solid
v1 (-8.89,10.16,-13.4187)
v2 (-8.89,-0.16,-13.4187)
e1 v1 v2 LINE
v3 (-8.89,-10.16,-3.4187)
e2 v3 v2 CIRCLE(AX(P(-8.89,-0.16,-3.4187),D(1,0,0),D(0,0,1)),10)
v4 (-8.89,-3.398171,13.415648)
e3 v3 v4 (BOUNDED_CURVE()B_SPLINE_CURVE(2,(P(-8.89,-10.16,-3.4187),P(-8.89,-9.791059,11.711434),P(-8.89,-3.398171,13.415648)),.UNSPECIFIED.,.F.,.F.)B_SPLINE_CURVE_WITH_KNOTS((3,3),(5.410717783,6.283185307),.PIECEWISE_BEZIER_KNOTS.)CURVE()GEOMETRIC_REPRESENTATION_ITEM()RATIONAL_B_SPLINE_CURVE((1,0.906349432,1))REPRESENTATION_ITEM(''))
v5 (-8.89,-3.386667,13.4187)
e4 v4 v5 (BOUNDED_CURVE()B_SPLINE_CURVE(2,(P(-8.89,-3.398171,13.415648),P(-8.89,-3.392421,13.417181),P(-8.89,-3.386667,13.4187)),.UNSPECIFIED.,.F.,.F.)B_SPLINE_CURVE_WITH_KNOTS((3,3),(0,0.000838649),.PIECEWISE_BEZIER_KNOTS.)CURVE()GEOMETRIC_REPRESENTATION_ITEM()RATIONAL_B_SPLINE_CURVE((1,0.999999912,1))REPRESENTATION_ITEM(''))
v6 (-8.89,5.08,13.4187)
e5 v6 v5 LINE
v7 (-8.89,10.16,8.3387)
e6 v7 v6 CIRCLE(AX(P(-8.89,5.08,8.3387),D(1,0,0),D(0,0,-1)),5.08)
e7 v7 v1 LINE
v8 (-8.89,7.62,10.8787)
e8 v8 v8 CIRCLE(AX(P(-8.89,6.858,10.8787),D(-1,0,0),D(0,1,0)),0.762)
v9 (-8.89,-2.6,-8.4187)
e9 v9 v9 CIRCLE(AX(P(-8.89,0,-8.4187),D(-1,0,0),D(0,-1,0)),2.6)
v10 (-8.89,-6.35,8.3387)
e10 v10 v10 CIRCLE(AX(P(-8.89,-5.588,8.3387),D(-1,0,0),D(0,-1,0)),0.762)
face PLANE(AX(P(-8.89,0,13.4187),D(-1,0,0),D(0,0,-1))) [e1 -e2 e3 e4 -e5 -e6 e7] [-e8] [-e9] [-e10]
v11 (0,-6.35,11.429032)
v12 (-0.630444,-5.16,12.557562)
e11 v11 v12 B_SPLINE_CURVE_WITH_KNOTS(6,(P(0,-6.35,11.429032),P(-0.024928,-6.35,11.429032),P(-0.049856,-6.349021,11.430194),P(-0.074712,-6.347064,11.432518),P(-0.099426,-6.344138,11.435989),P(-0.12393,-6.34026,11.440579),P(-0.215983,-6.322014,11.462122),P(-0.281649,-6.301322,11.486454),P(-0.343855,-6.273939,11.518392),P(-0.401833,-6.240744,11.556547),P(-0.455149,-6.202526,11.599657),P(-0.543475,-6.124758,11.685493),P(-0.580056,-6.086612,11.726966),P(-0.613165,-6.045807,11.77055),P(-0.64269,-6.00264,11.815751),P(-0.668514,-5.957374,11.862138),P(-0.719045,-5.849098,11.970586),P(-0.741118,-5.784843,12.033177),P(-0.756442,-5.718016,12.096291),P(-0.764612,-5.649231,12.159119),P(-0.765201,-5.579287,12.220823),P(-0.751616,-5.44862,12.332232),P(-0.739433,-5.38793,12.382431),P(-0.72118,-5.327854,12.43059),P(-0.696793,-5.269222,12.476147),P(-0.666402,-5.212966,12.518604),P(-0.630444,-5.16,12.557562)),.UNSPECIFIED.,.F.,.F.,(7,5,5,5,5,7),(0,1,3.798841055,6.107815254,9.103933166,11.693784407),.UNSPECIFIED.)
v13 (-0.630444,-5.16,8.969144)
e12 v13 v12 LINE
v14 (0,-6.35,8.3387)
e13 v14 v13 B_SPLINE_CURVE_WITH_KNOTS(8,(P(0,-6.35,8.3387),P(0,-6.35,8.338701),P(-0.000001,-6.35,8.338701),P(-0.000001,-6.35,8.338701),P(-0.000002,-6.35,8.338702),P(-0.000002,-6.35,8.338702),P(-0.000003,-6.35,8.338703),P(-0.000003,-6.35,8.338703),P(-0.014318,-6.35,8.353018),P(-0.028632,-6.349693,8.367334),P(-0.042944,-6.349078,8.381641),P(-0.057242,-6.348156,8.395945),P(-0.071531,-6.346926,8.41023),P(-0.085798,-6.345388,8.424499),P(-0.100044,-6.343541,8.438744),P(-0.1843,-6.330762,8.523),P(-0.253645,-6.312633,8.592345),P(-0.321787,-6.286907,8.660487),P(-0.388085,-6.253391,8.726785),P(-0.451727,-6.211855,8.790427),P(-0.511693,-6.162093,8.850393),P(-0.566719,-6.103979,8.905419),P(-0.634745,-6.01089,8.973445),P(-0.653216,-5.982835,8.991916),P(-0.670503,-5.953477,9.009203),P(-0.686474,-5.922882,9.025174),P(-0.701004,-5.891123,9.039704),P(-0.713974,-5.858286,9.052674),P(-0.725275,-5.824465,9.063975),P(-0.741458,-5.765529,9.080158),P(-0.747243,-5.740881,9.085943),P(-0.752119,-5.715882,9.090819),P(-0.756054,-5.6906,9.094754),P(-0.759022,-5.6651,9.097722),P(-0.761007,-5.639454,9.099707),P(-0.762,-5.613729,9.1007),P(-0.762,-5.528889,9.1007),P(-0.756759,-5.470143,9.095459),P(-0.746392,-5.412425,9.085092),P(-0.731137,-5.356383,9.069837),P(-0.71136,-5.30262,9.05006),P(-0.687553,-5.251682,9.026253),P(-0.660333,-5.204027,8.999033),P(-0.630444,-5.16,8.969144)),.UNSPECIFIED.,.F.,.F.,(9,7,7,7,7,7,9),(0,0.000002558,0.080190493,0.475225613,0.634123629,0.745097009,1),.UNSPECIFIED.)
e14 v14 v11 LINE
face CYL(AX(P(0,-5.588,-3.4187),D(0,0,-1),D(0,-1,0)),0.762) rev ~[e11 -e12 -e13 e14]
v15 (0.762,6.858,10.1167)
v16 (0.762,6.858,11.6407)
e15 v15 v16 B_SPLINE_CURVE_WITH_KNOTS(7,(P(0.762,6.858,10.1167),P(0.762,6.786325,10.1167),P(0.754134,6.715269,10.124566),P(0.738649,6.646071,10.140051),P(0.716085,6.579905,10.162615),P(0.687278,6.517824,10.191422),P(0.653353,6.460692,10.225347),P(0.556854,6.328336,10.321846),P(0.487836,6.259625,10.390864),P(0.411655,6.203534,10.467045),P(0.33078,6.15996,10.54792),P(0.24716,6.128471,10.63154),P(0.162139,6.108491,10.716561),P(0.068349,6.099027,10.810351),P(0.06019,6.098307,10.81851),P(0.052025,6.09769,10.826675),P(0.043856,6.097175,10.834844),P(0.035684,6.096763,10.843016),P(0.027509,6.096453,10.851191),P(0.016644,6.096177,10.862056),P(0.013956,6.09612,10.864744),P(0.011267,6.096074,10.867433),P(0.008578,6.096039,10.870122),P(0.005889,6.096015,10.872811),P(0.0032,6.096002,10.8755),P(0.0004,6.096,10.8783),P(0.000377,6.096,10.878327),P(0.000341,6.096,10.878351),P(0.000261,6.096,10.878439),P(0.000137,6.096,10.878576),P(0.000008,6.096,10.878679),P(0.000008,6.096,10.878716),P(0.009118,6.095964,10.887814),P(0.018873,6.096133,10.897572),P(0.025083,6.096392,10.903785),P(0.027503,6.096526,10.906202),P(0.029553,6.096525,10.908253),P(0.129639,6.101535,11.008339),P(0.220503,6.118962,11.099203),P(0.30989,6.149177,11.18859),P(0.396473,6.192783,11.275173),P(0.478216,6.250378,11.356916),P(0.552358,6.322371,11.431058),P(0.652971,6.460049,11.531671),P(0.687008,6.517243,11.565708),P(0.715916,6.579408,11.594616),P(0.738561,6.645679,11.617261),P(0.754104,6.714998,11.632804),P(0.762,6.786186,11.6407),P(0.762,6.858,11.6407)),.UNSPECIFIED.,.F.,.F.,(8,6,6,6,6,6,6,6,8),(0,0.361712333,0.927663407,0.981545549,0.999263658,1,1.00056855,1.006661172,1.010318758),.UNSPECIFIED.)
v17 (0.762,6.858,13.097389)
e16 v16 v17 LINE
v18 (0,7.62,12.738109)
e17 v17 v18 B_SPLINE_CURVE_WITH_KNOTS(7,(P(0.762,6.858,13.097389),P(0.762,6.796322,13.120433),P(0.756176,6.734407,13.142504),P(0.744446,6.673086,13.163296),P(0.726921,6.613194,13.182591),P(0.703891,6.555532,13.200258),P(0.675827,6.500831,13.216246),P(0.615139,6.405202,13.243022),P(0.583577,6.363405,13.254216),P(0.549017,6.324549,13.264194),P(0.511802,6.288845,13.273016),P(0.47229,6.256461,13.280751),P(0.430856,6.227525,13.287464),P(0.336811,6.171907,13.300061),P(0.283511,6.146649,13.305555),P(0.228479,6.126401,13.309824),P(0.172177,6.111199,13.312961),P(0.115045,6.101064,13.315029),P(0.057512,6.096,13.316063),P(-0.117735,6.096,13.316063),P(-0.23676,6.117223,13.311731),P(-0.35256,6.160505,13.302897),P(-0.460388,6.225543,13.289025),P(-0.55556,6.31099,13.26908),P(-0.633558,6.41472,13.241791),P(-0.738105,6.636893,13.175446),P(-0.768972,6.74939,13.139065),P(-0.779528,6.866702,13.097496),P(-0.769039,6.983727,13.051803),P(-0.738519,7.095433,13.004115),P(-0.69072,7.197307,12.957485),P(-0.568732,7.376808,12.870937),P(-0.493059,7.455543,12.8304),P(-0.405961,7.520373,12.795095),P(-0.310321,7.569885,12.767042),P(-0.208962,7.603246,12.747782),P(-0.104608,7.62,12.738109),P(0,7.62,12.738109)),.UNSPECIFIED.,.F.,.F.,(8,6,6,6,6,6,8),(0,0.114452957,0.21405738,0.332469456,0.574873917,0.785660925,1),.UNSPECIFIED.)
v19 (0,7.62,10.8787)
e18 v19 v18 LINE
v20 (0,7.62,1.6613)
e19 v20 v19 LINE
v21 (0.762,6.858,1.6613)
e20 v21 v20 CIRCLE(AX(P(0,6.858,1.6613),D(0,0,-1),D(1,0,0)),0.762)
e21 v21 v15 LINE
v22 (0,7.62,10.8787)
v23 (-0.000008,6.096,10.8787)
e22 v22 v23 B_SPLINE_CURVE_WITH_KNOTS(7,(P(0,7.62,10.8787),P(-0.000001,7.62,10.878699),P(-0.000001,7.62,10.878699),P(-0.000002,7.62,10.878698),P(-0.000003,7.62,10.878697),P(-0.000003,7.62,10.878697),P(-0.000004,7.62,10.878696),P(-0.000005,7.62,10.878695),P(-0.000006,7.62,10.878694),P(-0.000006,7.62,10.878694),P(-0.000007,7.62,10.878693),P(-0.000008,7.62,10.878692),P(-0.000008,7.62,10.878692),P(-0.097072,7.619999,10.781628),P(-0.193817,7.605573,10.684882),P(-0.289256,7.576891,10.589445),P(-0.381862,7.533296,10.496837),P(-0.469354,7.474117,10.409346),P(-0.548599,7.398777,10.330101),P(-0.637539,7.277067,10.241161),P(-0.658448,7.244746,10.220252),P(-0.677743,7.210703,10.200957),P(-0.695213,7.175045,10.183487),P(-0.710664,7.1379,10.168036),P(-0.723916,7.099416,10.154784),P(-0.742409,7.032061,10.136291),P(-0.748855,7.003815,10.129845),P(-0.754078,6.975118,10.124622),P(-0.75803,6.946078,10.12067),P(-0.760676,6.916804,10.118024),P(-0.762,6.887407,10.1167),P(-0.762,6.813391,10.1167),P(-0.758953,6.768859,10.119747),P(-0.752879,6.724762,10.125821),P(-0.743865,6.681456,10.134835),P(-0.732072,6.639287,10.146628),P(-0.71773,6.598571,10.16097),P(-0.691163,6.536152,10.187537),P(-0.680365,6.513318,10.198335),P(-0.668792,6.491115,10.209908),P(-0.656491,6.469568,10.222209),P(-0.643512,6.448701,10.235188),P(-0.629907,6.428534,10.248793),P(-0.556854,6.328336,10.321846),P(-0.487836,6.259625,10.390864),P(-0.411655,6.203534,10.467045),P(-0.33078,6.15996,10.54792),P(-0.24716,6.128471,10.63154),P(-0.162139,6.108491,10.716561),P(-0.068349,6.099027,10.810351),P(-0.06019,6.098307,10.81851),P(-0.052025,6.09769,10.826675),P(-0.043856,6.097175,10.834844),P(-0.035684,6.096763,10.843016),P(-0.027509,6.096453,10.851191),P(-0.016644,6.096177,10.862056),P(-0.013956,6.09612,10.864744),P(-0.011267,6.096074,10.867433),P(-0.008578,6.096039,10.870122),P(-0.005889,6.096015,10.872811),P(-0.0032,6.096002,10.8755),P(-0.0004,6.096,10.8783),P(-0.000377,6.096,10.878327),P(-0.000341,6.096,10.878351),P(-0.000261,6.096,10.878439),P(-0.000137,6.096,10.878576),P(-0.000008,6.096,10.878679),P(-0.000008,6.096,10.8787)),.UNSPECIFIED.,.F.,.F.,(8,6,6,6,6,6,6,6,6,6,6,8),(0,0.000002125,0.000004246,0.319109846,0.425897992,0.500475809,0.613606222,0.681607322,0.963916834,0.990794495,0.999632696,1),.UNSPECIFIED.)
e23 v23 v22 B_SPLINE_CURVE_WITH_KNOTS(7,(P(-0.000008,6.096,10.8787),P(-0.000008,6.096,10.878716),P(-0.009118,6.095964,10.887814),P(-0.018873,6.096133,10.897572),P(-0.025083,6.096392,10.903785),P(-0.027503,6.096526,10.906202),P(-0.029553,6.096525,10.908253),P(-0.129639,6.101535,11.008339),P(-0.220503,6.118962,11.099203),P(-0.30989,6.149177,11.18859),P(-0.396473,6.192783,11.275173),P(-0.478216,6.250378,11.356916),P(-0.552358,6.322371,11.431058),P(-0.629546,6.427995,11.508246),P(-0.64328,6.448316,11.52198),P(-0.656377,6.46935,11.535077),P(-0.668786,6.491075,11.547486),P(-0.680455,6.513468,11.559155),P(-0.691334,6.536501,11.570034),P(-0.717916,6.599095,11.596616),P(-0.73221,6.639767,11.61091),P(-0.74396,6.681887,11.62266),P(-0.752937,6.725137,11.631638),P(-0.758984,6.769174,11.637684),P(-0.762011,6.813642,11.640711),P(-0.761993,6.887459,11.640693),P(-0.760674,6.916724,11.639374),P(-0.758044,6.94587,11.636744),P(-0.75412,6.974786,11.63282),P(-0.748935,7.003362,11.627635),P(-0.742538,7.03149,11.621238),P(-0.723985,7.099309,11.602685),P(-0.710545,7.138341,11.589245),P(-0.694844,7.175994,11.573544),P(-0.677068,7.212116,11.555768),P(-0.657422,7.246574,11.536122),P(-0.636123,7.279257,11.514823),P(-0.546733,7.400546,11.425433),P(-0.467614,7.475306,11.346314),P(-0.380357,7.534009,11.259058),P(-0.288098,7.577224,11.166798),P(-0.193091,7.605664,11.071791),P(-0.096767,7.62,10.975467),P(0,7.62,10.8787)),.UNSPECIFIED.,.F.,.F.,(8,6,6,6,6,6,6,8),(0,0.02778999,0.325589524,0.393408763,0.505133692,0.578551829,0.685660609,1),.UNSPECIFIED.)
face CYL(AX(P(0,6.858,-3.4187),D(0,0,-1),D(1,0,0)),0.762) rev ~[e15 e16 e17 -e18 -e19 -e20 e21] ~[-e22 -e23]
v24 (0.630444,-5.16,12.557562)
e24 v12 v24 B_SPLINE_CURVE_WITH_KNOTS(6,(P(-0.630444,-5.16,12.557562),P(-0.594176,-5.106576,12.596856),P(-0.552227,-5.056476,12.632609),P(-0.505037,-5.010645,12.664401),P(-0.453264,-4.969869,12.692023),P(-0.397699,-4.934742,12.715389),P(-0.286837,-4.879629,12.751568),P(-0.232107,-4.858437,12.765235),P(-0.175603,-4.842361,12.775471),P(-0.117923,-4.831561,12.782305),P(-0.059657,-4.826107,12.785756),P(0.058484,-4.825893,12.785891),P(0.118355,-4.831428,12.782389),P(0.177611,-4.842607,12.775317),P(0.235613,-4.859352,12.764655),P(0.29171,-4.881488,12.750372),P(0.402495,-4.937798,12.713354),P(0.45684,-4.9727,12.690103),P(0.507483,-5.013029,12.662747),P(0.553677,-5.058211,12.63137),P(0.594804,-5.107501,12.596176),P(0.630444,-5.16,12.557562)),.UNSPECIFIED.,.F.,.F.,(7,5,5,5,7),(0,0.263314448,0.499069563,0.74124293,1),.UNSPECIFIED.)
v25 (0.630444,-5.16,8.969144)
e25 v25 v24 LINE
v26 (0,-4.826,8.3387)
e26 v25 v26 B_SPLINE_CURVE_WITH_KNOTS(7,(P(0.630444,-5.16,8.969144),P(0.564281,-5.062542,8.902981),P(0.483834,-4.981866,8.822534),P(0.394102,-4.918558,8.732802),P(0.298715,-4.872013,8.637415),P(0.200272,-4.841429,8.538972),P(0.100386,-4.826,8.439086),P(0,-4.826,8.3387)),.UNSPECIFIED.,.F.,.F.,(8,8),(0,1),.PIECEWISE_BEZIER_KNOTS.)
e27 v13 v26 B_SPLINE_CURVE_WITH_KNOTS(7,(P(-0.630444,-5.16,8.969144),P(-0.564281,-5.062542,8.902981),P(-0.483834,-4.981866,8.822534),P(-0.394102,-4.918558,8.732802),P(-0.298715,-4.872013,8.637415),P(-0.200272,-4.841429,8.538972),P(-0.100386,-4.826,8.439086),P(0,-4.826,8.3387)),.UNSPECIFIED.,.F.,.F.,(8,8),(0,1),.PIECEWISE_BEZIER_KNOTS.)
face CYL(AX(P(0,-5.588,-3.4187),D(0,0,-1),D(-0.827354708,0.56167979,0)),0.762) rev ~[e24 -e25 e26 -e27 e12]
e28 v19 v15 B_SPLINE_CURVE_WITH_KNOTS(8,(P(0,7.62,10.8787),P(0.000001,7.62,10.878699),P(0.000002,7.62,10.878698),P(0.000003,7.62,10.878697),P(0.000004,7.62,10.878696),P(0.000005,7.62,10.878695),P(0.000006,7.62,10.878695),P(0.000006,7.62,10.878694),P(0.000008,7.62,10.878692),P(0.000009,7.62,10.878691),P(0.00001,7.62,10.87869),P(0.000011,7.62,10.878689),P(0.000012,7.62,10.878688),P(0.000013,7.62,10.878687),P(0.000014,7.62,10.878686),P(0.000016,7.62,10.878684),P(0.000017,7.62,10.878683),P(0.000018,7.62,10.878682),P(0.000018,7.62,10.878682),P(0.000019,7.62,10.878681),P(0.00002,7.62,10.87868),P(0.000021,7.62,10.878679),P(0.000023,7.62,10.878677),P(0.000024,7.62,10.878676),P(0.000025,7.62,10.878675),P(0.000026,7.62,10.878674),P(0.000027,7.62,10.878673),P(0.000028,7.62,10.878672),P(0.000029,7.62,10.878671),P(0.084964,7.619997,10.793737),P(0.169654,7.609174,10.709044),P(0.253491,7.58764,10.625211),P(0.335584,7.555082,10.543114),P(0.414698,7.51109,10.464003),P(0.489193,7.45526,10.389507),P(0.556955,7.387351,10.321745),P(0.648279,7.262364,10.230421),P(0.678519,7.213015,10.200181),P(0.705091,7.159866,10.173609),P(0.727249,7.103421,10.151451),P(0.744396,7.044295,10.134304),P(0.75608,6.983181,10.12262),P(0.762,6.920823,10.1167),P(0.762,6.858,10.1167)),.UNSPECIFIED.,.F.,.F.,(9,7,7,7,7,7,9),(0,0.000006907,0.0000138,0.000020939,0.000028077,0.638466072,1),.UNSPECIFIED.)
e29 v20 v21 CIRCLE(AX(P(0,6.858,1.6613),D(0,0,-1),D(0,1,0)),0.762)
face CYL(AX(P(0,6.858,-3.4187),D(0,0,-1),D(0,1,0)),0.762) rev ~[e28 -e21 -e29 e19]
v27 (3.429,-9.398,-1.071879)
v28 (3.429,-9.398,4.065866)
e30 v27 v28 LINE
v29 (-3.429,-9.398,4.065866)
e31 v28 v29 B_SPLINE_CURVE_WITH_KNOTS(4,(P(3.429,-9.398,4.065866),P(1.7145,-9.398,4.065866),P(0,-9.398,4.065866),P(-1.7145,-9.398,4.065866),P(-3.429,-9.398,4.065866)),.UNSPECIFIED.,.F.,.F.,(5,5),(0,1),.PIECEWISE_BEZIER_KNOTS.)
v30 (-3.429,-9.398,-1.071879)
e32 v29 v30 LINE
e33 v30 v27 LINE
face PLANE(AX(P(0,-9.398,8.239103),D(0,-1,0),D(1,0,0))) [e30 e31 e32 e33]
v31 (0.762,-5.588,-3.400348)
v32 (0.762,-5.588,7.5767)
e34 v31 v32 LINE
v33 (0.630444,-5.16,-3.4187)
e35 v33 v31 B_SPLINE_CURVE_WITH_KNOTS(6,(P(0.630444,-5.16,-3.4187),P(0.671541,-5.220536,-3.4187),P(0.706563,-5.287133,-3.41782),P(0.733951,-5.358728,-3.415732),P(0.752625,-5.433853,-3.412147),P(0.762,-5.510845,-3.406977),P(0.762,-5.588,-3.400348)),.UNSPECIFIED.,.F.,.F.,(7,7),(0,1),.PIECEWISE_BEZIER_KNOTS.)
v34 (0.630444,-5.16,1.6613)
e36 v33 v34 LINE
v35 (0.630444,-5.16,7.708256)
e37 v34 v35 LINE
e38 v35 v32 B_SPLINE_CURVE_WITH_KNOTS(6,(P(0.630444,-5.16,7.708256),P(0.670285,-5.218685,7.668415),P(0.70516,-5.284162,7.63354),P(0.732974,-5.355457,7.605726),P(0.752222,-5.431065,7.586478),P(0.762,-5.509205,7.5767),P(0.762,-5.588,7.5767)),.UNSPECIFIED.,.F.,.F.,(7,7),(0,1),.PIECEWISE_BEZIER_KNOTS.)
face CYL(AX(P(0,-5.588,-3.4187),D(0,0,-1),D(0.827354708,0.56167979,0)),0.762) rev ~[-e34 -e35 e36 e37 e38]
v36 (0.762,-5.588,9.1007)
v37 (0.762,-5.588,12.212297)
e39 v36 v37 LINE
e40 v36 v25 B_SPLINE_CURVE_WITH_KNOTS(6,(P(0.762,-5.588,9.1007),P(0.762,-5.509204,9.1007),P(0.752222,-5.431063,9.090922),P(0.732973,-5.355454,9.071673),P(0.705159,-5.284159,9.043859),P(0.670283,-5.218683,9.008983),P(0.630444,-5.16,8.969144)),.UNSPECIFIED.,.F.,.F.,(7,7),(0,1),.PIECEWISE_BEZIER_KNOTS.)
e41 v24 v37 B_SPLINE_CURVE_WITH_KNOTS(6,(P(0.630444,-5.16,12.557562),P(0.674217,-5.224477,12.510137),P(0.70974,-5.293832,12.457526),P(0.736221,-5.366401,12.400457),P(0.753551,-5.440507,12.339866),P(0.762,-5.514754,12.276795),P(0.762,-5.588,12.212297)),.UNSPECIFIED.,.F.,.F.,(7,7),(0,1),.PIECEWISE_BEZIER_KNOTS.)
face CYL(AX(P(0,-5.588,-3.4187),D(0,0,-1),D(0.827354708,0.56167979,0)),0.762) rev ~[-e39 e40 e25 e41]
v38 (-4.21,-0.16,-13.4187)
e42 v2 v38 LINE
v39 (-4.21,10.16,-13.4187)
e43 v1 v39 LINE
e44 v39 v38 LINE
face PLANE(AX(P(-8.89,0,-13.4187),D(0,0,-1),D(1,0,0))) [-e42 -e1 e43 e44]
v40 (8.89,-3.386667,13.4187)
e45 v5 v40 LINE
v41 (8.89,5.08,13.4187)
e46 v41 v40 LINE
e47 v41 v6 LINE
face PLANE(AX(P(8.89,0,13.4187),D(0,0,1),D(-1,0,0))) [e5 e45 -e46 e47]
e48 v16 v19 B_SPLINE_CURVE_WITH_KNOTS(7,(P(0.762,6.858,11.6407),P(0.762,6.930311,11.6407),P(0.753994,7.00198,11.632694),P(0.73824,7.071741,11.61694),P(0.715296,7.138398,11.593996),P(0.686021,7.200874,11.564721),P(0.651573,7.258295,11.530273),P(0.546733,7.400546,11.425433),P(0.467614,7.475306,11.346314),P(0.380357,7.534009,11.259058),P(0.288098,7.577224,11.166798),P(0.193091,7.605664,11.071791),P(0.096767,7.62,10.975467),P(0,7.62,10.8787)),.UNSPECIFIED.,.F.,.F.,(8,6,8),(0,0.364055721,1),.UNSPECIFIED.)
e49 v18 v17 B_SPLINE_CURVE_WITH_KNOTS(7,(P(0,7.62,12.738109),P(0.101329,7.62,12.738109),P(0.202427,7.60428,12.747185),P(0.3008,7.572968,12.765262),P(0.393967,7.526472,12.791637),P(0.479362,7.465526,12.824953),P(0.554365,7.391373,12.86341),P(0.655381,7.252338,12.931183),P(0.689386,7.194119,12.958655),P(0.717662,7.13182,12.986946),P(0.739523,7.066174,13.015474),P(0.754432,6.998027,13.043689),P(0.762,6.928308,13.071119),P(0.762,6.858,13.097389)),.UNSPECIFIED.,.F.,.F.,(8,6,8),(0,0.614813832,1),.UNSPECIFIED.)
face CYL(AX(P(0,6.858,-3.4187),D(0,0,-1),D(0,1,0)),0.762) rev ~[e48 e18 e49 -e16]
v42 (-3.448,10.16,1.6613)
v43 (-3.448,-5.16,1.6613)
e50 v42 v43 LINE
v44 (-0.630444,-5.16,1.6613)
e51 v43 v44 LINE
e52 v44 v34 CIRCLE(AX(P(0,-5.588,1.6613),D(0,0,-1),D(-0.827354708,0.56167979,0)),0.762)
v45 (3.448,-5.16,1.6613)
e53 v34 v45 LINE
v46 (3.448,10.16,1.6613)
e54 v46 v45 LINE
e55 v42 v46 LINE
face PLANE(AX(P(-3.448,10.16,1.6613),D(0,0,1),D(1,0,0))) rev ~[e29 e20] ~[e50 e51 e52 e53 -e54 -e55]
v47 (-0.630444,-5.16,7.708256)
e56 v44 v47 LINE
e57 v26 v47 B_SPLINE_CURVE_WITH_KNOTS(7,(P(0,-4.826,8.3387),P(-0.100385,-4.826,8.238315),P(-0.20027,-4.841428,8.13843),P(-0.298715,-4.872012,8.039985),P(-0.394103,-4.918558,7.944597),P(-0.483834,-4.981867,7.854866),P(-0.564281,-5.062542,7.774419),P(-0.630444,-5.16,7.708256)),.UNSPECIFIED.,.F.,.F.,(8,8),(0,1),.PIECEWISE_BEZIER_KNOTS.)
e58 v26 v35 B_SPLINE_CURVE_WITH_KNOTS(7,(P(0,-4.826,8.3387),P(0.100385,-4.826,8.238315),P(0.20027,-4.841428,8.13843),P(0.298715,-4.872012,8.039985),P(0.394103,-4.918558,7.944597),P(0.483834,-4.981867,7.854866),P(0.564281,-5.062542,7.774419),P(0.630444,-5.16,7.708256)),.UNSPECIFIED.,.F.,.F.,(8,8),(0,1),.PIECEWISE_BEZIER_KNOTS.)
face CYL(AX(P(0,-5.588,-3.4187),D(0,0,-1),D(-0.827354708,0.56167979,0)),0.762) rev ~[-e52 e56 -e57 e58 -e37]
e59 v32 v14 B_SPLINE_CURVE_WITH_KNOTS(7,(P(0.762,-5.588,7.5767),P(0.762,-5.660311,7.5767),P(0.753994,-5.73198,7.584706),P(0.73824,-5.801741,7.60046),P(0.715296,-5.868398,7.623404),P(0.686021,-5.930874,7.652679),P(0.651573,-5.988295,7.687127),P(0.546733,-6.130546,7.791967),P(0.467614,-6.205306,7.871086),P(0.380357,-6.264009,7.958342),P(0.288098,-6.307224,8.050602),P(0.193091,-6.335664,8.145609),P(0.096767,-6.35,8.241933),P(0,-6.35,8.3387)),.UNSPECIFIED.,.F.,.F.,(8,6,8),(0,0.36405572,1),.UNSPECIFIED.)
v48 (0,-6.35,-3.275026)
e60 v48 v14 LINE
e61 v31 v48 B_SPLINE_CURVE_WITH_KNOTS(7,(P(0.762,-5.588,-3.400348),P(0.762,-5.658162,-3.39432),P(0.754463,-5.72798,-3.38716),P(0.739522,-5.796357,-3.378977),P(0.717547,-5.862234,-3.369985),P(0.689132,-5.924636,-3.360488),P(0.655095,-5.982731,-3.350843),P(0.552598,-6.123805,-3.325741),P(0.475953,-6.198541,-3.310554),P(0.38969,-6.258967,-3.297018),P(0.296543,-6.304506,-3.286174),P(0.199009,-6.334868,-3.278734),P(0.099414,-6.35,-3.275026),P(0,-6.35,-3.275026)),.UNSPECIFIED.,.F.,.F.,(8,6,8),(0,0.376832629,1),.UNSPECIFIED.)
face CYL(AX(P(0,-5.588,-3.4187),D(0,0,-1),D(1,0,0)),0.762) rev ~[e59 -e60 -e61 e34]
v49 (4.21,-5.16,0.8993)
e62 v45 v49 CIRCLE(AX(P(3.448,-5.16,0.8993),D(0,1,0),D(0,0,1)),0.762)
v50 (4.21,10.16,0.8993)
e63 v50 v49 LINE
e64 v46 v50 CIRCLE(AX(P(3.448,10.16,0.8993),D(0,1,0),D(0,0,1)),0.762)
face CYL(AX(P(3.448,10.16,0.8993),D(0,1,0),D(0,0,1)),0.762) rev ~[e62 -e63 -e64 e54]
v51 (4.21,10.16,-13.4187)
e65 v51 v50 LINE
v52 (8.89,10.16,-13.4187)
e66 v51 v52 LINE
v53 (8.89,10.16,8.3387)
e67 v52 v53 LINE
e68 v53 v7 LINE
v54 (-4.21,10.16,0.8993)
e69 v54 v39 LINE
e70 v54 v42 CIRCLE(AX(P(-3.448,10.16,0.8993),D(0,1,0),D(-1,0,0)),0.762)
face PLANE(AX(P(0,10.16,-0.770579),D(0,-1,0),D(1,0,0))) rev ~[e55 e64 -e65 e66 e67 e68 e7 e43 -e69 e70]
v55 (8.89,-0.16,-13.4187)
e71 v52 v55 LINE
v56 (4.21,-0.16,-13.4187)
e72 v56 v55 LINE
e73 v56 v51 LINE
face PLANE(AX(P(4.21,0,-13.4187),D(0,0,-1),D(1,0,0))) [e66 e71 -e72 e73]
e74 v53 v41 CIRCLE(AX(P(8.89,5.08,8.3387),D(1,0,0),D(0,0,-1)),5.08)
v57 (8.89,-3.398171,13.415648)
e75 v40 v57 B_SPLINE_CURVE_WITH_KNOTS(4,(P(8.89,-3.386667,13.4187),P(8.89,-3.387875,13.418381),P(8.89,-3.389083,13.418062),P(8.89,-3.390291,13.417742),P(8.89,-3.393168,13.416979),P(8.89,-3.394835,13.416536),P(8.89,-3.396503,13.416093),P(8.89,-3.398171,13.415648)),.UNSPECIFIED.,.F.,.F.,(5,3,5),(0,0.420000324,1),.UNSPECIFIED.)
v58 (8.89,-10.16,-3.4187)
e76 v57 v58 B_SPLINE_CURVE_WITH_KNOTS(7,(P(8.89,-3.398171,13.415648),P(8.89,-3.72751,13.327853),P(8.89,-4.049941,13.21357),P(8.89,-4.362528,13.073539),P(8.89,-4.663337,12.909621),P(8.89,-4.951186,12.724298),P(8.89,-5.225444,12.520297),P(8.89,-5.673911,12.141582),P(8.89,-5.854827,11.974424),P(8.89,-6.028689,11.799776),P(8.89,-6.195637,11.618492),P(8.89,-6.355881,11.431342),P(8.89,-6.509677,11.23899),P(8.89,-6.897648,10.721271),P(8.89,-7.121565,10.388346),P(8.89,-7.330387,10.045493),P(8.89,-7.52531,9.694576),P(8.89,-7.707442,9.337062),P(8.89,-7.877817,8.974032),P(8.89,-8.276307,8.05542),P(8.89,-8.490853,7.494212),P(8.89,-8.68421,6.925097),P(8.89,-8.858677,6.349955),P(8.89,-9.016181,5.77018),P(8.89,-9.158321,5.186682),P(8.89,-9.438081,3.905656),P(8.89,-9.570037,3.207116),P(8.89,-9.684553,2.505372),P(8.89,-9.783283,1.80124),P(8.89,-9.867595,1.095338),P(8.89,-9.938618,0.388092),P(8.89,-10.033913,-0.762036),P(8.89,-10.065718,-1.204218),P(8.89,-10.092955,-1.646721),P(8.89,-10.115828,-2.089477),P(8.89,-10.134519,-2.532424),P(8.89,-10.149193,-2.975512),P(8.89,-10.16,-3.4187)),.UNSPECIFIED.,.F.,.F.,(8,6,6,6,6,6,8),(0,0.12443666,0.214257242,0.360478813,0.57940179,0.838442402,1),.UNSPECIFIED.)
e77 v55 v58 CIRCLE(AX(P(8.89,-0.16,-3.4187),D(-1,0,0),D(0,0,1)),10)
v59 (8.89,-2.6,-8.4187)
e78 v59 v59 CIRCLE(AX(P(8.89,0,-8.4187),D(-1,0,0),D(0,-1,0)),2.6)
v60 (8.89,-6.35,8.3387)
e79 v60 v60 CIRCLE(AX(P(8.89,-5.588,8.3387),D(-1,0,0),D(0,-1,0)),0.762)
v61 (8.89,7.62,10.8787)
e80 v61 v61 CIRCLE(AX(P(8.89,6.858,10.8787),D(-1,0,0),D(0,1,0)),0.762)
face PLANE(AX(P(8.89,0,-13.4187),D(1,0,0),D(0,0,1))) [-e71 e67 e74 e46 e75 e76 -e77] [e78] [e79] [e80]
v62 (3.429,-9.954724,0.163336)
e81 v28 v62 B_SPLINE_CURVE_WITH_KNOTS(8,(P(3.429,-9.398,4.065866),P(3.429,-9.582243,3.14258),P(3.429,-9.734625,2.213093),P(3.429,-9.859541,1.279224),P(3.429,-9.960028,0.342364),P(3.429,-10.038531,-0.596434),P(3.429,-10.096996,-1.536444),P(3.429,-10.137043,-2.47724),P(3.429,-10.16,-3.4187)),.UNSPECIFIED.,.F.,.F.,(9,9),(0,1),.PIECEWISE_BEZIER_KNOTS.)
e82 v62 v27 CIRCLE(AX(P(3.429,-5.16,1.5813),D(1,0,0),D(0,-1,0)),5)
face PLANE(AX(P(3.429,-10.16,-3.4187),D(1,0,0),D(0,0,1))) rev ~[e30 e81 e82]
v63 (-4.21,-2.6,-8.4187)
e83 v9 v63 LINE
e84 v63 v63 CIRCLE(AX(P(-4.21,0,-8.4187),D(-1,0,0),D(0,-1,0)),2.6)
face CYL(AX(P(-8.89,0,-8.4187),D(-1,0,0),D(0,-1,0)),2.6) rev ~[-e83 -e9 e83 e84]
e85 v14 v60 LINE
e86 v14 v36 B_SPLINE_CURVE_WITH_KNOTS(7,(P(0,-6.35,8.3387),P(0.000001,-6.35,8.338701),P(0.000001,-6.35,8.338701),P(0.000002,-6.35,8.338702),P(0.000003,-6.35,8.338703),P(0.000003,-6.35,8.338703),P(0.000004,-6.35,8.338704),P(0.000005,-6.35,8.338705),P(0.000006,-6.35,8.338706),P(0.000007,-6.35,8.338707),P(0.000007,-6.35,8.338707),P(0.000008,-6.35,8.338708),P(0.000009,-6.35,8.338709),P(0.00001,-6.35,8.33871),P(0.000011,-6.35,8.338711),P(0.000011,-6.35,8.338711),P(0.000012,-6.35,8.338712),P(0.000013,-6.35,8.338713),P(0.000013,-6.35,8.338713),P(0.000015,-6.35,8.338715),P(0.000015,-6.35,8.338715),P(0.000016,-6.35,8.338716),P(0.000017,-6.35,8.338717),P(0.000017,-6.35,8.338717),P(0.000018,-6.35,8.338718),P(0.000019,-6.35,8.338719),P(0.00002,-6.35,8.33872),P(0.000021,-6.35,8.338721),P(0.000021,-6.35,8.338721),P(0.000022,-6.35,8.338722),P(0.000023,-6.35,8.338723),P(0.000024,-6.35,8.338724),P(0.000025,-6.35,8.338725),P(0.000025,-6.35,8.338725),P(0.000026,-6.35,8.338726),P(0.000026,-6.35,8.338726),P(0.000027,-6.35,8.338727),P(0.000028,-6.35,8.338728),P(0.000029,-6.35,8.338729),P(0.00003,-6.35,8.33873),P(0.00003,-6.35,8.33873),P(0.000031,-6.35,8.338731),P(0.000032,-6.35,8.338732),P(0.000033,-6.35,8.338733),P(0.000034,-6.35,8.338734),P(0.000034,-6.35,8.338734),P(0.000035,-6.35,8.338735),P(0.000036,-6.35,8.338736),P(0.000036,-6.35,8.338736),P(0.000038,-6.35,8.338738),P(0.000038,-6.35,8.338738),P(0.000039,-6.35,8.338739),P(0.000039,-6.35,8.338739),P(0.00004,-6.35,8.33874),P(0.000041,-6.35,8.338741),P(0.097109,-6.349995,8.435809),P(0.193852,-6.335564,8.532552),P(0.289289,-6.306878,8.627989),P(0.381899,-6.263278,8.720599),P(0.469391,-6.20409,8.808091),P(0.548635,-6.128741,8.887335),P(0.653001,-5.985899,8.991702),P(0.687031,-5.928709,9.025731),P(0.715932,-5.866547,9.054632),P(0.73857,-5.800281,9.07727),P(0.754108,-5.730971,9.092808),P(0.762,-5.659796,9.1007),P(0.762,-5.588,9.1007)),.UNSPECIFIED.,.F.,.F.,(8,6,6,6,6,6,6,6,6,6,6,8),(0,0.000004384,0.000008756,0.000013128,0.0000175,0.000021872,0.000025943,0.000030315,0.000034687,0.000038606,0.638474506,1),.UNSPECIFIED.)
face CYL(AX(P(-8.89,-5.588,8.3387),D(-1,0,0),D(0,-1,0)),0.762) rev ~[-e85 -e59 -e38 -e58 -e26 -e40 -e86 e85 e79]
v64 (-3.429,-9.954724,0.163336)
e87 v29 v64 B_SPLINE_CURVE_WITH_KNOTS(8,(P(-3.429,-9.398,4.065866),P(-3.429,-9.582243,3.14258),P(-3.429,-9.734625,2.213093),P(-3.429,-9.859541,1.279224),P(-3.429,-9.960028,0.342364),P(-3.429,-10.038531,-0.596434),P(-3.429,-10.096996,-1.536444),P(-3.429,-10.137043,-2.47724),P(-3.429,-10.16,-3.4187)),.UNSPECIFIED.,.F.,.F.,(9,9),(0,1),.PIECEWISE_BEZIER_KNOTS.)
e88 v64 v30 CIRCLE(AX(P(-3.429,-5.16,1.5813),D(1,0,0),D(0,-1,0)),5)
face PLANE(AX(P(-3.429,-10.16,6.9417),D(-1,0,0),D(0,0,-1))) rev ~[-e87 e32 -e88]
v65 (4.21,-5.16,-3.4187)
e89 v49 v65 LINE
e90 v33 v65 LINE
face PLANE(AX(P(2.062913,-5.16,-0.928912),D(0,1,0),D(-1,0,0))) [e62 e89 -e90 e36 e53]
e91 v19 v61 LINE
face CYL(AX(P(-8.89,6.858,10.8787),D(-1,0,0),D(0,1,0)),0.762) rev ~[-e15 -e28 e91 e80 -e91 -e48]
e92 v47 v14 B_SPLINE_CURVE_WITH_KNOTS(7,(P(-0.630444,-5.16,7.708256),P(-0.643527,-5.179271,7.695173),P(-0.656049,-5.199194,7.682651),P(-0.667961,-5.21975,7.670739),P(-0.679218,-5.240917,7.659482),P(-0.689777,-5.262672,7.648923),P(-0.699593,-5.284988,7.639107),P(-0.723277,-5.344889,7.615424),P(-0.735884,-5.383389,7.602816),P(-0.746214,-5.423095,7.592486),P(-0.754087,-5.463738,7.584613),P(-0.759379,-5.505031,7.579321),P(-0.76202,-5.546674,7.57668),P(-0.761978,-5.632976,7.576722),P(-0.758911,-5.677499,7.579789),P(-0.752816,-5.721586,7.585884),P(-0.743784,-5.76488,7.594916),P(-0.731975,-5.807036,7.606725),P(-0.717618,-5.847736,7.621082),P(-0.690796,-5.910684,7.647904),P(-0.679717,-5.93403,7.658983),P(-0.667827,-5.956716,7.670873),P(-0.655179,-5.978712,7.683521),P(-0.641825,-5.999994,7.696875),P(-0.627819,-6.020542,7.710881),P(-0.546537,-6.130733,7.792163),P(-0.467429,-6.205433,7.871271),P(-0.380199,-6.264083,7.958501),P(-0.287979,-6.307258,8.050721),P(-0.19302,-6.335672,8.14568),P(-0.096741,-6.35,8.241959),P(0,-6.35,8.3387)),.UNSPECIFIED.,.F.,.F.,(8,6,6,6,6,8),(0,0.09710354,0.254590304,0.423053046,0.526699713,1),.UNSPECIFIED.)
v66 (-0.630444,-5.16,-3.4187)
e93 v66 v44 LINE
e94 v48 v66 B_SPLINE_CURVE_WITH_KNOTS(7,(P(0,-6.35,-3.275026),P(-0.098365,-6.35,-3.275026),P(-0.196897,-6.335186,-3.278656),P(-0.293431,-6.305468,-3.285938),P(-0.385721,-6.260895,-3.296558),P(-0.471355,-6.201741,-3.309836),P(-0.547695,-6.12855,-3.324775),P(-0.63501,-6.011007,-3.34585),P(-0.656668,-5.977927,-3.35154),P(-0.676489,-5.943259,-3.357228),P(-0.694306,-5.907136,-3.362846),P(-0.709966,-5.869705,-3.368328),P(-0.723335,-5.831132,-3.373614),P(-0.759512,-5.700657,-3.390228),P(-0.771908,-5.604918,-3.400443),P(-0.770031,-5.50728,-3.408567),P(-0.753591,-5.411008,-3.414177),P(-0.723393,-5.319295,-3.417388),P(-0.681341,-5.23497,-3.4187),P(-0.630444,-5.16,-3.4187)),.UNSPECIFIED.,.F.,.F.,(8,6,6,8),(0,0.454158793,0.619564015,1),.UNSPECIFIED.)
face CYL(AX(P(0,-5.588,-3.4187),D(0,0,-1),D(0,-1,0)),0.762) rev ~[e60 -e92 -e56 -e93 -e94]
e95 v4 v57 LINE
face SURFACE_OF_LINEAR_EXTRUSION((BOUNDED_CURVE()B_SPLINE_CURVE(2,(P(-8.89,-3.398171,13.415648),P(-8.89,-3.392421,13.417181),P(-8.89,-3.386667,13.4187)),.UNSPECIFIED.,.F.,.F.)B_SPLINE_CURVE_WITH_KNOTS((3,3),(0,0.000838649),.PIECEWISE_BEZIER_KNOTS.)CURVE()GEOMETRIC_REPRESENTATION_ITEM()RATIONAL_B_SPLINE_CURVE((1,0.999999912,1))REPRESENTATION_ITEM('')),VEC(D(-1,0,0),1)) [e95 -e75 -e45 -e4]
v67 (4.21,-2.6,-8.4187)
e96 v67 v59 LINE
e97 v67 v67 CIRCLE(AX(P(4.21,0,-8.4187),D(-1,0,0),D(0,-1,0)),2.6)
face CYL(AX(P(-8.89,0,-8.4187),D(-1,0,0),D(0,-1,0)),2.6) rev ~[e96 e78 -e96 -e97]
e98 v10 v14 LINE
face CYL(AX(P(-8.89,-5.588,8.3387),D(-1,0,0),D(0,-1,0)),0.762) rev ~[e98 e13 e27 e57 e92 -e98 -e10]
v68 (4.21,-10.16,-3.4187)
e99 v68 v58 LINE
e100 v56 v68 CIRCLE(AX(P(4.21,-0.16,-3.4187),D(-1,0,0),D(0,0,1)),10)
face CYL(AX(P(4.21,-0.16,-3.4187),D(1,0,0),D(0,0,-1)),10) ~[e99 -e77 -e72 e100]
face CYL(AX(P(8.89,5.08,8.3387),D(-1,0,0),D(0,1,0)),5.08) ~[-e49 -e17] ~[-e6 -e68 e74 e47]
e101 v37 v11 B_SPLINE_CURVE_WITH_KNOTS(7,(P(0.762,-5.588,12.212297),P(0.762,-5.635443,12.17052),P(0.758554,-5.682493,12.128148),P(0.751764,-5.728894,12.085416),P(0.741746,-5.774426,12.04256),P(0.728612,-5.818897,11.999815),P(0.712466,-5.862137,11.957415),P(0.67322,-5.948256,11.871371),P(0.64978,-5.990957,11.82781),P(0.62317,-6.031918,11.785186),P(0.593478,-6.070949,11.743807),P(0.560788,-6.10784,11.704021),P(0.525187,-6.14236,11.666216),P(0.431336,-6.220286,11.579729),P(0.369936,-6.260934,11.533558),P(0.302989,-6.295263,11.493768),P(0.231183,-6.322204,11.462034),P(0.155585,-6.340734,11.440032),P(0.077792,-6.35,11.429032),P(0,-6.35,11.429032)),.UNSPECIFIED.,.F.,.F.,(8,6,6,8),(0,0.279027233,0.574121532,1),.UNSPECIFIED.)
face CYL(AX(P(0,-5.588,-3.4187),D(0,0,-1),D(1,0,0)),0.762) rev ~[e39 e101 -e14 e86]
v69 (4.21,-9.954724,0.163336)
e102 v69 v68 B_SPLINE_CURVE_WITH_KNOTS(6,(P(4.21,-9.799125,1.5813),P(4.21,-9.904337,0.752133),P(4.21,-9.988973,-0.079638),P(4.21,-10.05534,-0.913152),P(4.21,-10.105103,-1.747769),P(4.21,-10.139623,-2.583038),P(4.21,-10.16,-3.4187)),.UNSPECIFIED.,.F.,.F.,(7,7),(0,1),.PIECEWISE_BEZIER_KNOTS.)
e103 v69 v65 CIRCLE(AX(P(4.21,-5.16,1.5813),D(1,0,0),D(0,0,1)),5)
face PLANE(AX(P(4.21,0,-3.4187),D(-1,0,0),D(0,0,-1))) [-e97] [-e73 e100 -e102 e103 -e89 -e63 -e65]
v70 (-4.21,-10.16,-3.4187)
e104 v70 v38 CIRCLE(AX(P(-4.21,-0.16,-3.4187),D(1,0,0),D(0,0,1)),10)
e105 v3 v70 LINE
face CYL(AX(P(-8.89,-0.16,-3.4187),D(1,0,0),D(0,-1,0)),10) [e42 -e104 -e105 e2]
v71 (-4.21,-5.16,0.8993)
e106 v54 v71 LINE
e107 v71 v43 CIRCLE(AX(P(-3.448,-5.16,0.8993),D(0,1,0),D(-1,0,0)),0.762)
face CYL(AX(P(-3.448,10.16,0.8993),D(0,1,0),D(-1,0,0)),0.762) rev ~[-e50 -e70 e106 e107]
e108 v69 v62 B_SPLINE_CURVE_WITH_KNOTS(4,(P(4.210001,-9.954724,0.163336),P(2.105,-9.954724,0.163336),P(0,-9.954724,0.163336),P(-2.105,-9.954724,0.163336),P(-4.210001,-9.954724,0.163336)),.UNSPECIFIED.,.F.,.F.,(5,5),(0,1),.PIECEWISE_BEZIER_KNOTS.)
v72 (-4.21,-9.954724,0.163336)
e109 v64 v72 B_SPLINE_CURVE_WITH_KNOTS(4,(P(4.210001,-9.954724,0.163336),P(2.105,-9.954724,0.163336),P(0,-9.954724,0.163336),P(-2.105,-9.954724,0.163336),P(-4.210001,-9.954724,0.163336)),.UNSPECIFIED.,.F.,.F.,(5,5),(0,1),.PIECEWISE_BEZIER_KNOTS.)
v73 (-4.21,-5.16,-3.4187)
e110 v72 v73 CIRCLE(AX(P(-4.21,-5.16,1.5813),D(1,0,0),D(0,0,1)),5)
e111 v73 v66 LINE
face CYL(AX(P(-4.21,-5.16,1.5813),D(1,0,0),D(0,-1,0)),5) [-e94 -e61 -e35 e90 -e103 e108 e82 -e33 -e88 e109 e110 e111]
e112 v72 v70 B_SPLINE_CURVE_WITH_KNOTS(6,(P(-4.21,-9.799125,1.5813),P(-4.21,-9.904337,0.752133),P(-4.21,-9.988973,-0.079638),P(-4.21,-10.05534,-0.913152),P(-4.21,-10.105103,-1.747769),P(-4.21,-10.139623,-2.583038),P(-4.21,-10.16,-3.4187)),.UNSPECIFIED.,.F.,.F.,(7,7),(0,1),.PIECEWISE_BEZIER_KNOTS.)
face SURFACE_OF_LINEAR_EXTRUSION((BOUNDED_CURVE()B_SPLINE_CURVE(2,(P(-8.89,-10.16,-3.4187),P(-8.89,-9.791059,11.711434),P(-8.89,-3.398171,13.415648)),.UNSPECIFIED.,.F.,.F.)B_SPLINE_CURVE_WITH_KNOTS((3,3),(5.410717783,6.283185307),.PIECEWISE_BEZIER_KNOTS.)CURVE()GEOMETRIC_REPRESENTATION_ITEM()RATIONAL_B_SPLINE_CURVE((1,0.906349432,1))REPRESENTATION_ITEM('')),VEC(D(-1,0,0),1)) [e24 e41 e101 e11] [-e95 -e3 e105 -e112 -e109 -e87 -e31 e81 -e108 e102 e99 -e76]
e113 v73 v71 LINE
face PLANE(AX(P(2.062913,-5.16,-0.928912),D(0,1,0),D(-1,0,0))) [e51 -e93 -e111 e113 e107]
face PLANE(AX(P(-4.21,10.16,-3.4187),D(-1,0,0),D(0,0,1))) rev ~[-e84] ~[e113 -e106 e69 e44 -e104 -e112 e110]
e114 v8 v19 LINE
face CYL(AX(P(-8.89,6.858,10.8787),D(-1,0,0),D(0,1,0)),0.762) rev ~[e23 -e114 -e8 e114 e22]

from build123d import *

# Parameters (mm, degrees)
F1_DEPTH  = 10.16
F2_R      = 2.6
F3_DEPTH  = 17.781
F4_R      = 10
F5_R      = 5
F7_DEPTH  = 17.781
F8_R      = 5.08
F10_DEPTH = 16.8384001672
F11_R     = 0.762
F12_DEPTH = 17.7810001
F16_DEPTH = 15.32
F17_DEPTH = 0.762


# Not quite as in the source:
# - an extrude ends at something that could not be found from the text; its depth is read off the source's solid
# - a feature names something its author has since deleted; it is built from what else it names


with BuildPart() as f1:
    # F0 (on Front) → F1 (new body, symmetric)
    with BuildSketch(Plane.XZ):
        Polygon((4.21, -13.4187000336), (8.89, -13.4187000336), (8.89, 13.4187000336), (-8.89, 13.4187000336), (-8.89, -13.4187000336), (-4.21, -13.4187000336), (-4.21, -3.4187000336), (4.21, -3.4187000336), align=None)
    extrude(amount=F1_DEPTH, both=True)

    # F2 (on face) → F3 (cut, through all)
    with BuildSketch(Plane(origin=(-8.89, 0, 0), x_dir=(0, -1, 0), z_dir=(-1, 0, 0))):
        with Locations((0, -8.4187000336)):
            Circle(F2_R)
    extrude(amount=-F3_DEPTH, mode=Mode.SUBTRACT)

    # F4
    f4_edges = [f1.edges().sort_by_distance(p)[0] for p in [
        (6.55, -10.16, -13.4187),
        (-6.55, -10.16, -13.4187),
    ]]
    fillet(f4_edges, radius=F4_R)

    # F5
    f5_edges = [f1.edges().sort_by_distance(p)[0] for p in [
        (0, -10.16, -3.4187),
    ]]
    fillet(f5_edges, radius=F5_R)

    # F6 (on face) → F7 (cut, through all)
    with BuildSketch(Plane(origin=(-8.89, 0, 0), x_dir=(0, -1, 0), z_dir=(-1, 0, 0))):
        with BuildLine():
            Line((10.16, -3.4187000336), (10.16, 13.4187000336))
            Line((10.16, 13.4187000336), (3.3866666667, 13.4187000336))
            add(Edge.make_bspline(
                [(3.3981708443, 13.4156480579), (3.3924205969, 13.4171809572), (3.3866666667, 13.4187000336)],
                knots=[0, 0, 0, 0.0008386489, 0.0008386489, 0.0008386489], degree=2, weights=[1, 0.9999999121, 1]))
            add(Edge.make_bspline(
                [(10.16, -3.4187000336), (9.7910592754, 11.7114337008), (3.3981708443, 13.4156480579)],
                knots=[5.4107177834, 5.4107177834, 5.4107177834, 6.2831853072, 6.2831853072, 6.2831853072], degree=2, weights=[1, 0.9063494321, 1]))
        make_face()
    extrude(amount=-F7_DEPTH, mode=Mode.SUBTRACT)

    # F8
    f8_edges = [f1.edges().sort_by_distance(p)[0] for p in [
        (0, 10.16, 13.4187),
    ]]
    fillet(f8_edges, radius=F8_R)

    # F9 (on face) → F10 (cut, through all)
    with BuildSketch(Plane(origin=(0, 0, -3.4187000336), x_dir=(1, 0, 0), z_dir=(0, 0, -1))):
        with BuildLine():
            Line((0.6304442878, 5.16), (-0.6304442878, 5.16))
            ThreePointArc((-0.6304442878, 5.16), (0, 4.826), (0.6304442878, 5.16))
        make_face()
        with BuildLine():
            ThreePointArc((0, 6.35), (-0.6733424092, 5.9447267862), (-0.6304442878, 5.16))
            Line((-0.6304442878, 5.16), (0.6304442878, 5.16))
            ThreePointArc((0.6304442878, 5.16), (0.7283689132, 5.364118946), (0.762, 5.588))
            ThreePointArc((0.762, 5.588), (0.5388153673, 6.1268153673), (0, 6.35))
        make_face()
        with BuildLine():
            ThreePointArc((0.762, -6.858), (-0.5388153673, -6.3191846327), (0, -7.62))
            ThreePointArc((0, -7.62), (0.5388153673, -7.3968153673), (0.762, -6.858))
        make_face()
    extrude(amount=-F10_DEPTH, mode=Mode.SUBTRACT)

    # F11 (on face) → F12 (cut, through all)
    with BuildSketch(Plane(origin=(-8.89, 0, 0), x_dir=(0, -1, 0), z_dir=(-1, 0, 0))):
        with BuildLine():
            ThreePointArc((-6.096, 10.8787000336), (-6.858, 11.6407000336), (-7.62, 10.8787000336))
            ThreePointArc((-7.62, 10.8787000336), (-6.858, 10.1167000336), (-6.096, 10.8787000336))
        make_face()
        with Locations((5.588, 8.3387000336)):
            Circle(F11_R)
    extrude(amount=-F12_DEPTH, mode=Mode.SUBTRACT)

    # F15 (on face) → F16 (cut, through all)
    with BuildSketch(Plane(origin=(0, 10.16, 0), x_dir=(-1, 0, 0), z_dir=(0, 1, 0))):
        with BuildLine():
            Line((0, -3.4187000336), (0, 1.6612999664))
            Line((0, 1.6612999664), (-3.448, 1.6612999664))
            ThreePointArc((-3.448, 1.6612999664), (-3.9868153673, 1.4381153337), (-4.21, 0.8992999664))
            Line((-4.21, 0.8992999664), (-4.21, -3.4187000336))
            Line((-4.21, -3.4187000336), (0, -3.4187000336))
        make_face()
        with BuildLine():
            Line((3.448, 1.6612999664), (0, 1.6612999664))
            Line((0, 1.6612999664), (0, -3.4187000336))
            Line((0, -3.4187000336), (4.21, -3.4187000336))
            Line((4.21, -3.4187000336), (4.21, 0.8992999664))
            ThreePointArc((4.21, 0.8992999664), (3.9868153673, 1.4381153337), (3.448, 1.6612999664))
        make_face()
    extrude(amount=-F16_DEPTH, mode=Mode.SUBTRACT)

    # F14 (on face) → F17 (cut)
    with BuildSketch(Plane.XZ.offset(10.16)):
        with BuildLine():
            Line((0, 6.9417000336), (3.429, 6.9417000336))
            ThreePointArc((3.429, 6.9417000336), (2.4246691527, 9.3663691863), (0, 10.3707000336))
            ThreePointArc((0, 10.3707000336), (-2.4246691527, 9.3663691863), (-3.429, 6.9417000336))
            Line((-3.429, 6.9417000336), (0, 6.9417000336))
        make_face()
        with BuildLine():
            ThreePointArc((-3.429, 6.9417000336), (0, 3.5127000336), (3.429, 6.9417000336))
            Line((3.429, 6.9417000336), (0, 6.9417000336))
            Line((0, 6.9417000336), (-3.429, 6.9417000336))
        make_face()
        with BuildLine():
            Line((3.429, -3.4187000336), (3.429, 6.9417000336))
            ThreePointArc((3.429, 6.9417000336), (0, 3.5127000336), (-3.429, 6.9417000336))
            Line((-3.429, 6.9417000336), (-3.429, -3.4187000336))
            Line((-3.429, -3.4187000336), (3.429, -3.4187000336))
        make_face()
    extrude(amount=-F17_DEPTH, mode=Mode.SUBTRACT)


solid = f1.part
